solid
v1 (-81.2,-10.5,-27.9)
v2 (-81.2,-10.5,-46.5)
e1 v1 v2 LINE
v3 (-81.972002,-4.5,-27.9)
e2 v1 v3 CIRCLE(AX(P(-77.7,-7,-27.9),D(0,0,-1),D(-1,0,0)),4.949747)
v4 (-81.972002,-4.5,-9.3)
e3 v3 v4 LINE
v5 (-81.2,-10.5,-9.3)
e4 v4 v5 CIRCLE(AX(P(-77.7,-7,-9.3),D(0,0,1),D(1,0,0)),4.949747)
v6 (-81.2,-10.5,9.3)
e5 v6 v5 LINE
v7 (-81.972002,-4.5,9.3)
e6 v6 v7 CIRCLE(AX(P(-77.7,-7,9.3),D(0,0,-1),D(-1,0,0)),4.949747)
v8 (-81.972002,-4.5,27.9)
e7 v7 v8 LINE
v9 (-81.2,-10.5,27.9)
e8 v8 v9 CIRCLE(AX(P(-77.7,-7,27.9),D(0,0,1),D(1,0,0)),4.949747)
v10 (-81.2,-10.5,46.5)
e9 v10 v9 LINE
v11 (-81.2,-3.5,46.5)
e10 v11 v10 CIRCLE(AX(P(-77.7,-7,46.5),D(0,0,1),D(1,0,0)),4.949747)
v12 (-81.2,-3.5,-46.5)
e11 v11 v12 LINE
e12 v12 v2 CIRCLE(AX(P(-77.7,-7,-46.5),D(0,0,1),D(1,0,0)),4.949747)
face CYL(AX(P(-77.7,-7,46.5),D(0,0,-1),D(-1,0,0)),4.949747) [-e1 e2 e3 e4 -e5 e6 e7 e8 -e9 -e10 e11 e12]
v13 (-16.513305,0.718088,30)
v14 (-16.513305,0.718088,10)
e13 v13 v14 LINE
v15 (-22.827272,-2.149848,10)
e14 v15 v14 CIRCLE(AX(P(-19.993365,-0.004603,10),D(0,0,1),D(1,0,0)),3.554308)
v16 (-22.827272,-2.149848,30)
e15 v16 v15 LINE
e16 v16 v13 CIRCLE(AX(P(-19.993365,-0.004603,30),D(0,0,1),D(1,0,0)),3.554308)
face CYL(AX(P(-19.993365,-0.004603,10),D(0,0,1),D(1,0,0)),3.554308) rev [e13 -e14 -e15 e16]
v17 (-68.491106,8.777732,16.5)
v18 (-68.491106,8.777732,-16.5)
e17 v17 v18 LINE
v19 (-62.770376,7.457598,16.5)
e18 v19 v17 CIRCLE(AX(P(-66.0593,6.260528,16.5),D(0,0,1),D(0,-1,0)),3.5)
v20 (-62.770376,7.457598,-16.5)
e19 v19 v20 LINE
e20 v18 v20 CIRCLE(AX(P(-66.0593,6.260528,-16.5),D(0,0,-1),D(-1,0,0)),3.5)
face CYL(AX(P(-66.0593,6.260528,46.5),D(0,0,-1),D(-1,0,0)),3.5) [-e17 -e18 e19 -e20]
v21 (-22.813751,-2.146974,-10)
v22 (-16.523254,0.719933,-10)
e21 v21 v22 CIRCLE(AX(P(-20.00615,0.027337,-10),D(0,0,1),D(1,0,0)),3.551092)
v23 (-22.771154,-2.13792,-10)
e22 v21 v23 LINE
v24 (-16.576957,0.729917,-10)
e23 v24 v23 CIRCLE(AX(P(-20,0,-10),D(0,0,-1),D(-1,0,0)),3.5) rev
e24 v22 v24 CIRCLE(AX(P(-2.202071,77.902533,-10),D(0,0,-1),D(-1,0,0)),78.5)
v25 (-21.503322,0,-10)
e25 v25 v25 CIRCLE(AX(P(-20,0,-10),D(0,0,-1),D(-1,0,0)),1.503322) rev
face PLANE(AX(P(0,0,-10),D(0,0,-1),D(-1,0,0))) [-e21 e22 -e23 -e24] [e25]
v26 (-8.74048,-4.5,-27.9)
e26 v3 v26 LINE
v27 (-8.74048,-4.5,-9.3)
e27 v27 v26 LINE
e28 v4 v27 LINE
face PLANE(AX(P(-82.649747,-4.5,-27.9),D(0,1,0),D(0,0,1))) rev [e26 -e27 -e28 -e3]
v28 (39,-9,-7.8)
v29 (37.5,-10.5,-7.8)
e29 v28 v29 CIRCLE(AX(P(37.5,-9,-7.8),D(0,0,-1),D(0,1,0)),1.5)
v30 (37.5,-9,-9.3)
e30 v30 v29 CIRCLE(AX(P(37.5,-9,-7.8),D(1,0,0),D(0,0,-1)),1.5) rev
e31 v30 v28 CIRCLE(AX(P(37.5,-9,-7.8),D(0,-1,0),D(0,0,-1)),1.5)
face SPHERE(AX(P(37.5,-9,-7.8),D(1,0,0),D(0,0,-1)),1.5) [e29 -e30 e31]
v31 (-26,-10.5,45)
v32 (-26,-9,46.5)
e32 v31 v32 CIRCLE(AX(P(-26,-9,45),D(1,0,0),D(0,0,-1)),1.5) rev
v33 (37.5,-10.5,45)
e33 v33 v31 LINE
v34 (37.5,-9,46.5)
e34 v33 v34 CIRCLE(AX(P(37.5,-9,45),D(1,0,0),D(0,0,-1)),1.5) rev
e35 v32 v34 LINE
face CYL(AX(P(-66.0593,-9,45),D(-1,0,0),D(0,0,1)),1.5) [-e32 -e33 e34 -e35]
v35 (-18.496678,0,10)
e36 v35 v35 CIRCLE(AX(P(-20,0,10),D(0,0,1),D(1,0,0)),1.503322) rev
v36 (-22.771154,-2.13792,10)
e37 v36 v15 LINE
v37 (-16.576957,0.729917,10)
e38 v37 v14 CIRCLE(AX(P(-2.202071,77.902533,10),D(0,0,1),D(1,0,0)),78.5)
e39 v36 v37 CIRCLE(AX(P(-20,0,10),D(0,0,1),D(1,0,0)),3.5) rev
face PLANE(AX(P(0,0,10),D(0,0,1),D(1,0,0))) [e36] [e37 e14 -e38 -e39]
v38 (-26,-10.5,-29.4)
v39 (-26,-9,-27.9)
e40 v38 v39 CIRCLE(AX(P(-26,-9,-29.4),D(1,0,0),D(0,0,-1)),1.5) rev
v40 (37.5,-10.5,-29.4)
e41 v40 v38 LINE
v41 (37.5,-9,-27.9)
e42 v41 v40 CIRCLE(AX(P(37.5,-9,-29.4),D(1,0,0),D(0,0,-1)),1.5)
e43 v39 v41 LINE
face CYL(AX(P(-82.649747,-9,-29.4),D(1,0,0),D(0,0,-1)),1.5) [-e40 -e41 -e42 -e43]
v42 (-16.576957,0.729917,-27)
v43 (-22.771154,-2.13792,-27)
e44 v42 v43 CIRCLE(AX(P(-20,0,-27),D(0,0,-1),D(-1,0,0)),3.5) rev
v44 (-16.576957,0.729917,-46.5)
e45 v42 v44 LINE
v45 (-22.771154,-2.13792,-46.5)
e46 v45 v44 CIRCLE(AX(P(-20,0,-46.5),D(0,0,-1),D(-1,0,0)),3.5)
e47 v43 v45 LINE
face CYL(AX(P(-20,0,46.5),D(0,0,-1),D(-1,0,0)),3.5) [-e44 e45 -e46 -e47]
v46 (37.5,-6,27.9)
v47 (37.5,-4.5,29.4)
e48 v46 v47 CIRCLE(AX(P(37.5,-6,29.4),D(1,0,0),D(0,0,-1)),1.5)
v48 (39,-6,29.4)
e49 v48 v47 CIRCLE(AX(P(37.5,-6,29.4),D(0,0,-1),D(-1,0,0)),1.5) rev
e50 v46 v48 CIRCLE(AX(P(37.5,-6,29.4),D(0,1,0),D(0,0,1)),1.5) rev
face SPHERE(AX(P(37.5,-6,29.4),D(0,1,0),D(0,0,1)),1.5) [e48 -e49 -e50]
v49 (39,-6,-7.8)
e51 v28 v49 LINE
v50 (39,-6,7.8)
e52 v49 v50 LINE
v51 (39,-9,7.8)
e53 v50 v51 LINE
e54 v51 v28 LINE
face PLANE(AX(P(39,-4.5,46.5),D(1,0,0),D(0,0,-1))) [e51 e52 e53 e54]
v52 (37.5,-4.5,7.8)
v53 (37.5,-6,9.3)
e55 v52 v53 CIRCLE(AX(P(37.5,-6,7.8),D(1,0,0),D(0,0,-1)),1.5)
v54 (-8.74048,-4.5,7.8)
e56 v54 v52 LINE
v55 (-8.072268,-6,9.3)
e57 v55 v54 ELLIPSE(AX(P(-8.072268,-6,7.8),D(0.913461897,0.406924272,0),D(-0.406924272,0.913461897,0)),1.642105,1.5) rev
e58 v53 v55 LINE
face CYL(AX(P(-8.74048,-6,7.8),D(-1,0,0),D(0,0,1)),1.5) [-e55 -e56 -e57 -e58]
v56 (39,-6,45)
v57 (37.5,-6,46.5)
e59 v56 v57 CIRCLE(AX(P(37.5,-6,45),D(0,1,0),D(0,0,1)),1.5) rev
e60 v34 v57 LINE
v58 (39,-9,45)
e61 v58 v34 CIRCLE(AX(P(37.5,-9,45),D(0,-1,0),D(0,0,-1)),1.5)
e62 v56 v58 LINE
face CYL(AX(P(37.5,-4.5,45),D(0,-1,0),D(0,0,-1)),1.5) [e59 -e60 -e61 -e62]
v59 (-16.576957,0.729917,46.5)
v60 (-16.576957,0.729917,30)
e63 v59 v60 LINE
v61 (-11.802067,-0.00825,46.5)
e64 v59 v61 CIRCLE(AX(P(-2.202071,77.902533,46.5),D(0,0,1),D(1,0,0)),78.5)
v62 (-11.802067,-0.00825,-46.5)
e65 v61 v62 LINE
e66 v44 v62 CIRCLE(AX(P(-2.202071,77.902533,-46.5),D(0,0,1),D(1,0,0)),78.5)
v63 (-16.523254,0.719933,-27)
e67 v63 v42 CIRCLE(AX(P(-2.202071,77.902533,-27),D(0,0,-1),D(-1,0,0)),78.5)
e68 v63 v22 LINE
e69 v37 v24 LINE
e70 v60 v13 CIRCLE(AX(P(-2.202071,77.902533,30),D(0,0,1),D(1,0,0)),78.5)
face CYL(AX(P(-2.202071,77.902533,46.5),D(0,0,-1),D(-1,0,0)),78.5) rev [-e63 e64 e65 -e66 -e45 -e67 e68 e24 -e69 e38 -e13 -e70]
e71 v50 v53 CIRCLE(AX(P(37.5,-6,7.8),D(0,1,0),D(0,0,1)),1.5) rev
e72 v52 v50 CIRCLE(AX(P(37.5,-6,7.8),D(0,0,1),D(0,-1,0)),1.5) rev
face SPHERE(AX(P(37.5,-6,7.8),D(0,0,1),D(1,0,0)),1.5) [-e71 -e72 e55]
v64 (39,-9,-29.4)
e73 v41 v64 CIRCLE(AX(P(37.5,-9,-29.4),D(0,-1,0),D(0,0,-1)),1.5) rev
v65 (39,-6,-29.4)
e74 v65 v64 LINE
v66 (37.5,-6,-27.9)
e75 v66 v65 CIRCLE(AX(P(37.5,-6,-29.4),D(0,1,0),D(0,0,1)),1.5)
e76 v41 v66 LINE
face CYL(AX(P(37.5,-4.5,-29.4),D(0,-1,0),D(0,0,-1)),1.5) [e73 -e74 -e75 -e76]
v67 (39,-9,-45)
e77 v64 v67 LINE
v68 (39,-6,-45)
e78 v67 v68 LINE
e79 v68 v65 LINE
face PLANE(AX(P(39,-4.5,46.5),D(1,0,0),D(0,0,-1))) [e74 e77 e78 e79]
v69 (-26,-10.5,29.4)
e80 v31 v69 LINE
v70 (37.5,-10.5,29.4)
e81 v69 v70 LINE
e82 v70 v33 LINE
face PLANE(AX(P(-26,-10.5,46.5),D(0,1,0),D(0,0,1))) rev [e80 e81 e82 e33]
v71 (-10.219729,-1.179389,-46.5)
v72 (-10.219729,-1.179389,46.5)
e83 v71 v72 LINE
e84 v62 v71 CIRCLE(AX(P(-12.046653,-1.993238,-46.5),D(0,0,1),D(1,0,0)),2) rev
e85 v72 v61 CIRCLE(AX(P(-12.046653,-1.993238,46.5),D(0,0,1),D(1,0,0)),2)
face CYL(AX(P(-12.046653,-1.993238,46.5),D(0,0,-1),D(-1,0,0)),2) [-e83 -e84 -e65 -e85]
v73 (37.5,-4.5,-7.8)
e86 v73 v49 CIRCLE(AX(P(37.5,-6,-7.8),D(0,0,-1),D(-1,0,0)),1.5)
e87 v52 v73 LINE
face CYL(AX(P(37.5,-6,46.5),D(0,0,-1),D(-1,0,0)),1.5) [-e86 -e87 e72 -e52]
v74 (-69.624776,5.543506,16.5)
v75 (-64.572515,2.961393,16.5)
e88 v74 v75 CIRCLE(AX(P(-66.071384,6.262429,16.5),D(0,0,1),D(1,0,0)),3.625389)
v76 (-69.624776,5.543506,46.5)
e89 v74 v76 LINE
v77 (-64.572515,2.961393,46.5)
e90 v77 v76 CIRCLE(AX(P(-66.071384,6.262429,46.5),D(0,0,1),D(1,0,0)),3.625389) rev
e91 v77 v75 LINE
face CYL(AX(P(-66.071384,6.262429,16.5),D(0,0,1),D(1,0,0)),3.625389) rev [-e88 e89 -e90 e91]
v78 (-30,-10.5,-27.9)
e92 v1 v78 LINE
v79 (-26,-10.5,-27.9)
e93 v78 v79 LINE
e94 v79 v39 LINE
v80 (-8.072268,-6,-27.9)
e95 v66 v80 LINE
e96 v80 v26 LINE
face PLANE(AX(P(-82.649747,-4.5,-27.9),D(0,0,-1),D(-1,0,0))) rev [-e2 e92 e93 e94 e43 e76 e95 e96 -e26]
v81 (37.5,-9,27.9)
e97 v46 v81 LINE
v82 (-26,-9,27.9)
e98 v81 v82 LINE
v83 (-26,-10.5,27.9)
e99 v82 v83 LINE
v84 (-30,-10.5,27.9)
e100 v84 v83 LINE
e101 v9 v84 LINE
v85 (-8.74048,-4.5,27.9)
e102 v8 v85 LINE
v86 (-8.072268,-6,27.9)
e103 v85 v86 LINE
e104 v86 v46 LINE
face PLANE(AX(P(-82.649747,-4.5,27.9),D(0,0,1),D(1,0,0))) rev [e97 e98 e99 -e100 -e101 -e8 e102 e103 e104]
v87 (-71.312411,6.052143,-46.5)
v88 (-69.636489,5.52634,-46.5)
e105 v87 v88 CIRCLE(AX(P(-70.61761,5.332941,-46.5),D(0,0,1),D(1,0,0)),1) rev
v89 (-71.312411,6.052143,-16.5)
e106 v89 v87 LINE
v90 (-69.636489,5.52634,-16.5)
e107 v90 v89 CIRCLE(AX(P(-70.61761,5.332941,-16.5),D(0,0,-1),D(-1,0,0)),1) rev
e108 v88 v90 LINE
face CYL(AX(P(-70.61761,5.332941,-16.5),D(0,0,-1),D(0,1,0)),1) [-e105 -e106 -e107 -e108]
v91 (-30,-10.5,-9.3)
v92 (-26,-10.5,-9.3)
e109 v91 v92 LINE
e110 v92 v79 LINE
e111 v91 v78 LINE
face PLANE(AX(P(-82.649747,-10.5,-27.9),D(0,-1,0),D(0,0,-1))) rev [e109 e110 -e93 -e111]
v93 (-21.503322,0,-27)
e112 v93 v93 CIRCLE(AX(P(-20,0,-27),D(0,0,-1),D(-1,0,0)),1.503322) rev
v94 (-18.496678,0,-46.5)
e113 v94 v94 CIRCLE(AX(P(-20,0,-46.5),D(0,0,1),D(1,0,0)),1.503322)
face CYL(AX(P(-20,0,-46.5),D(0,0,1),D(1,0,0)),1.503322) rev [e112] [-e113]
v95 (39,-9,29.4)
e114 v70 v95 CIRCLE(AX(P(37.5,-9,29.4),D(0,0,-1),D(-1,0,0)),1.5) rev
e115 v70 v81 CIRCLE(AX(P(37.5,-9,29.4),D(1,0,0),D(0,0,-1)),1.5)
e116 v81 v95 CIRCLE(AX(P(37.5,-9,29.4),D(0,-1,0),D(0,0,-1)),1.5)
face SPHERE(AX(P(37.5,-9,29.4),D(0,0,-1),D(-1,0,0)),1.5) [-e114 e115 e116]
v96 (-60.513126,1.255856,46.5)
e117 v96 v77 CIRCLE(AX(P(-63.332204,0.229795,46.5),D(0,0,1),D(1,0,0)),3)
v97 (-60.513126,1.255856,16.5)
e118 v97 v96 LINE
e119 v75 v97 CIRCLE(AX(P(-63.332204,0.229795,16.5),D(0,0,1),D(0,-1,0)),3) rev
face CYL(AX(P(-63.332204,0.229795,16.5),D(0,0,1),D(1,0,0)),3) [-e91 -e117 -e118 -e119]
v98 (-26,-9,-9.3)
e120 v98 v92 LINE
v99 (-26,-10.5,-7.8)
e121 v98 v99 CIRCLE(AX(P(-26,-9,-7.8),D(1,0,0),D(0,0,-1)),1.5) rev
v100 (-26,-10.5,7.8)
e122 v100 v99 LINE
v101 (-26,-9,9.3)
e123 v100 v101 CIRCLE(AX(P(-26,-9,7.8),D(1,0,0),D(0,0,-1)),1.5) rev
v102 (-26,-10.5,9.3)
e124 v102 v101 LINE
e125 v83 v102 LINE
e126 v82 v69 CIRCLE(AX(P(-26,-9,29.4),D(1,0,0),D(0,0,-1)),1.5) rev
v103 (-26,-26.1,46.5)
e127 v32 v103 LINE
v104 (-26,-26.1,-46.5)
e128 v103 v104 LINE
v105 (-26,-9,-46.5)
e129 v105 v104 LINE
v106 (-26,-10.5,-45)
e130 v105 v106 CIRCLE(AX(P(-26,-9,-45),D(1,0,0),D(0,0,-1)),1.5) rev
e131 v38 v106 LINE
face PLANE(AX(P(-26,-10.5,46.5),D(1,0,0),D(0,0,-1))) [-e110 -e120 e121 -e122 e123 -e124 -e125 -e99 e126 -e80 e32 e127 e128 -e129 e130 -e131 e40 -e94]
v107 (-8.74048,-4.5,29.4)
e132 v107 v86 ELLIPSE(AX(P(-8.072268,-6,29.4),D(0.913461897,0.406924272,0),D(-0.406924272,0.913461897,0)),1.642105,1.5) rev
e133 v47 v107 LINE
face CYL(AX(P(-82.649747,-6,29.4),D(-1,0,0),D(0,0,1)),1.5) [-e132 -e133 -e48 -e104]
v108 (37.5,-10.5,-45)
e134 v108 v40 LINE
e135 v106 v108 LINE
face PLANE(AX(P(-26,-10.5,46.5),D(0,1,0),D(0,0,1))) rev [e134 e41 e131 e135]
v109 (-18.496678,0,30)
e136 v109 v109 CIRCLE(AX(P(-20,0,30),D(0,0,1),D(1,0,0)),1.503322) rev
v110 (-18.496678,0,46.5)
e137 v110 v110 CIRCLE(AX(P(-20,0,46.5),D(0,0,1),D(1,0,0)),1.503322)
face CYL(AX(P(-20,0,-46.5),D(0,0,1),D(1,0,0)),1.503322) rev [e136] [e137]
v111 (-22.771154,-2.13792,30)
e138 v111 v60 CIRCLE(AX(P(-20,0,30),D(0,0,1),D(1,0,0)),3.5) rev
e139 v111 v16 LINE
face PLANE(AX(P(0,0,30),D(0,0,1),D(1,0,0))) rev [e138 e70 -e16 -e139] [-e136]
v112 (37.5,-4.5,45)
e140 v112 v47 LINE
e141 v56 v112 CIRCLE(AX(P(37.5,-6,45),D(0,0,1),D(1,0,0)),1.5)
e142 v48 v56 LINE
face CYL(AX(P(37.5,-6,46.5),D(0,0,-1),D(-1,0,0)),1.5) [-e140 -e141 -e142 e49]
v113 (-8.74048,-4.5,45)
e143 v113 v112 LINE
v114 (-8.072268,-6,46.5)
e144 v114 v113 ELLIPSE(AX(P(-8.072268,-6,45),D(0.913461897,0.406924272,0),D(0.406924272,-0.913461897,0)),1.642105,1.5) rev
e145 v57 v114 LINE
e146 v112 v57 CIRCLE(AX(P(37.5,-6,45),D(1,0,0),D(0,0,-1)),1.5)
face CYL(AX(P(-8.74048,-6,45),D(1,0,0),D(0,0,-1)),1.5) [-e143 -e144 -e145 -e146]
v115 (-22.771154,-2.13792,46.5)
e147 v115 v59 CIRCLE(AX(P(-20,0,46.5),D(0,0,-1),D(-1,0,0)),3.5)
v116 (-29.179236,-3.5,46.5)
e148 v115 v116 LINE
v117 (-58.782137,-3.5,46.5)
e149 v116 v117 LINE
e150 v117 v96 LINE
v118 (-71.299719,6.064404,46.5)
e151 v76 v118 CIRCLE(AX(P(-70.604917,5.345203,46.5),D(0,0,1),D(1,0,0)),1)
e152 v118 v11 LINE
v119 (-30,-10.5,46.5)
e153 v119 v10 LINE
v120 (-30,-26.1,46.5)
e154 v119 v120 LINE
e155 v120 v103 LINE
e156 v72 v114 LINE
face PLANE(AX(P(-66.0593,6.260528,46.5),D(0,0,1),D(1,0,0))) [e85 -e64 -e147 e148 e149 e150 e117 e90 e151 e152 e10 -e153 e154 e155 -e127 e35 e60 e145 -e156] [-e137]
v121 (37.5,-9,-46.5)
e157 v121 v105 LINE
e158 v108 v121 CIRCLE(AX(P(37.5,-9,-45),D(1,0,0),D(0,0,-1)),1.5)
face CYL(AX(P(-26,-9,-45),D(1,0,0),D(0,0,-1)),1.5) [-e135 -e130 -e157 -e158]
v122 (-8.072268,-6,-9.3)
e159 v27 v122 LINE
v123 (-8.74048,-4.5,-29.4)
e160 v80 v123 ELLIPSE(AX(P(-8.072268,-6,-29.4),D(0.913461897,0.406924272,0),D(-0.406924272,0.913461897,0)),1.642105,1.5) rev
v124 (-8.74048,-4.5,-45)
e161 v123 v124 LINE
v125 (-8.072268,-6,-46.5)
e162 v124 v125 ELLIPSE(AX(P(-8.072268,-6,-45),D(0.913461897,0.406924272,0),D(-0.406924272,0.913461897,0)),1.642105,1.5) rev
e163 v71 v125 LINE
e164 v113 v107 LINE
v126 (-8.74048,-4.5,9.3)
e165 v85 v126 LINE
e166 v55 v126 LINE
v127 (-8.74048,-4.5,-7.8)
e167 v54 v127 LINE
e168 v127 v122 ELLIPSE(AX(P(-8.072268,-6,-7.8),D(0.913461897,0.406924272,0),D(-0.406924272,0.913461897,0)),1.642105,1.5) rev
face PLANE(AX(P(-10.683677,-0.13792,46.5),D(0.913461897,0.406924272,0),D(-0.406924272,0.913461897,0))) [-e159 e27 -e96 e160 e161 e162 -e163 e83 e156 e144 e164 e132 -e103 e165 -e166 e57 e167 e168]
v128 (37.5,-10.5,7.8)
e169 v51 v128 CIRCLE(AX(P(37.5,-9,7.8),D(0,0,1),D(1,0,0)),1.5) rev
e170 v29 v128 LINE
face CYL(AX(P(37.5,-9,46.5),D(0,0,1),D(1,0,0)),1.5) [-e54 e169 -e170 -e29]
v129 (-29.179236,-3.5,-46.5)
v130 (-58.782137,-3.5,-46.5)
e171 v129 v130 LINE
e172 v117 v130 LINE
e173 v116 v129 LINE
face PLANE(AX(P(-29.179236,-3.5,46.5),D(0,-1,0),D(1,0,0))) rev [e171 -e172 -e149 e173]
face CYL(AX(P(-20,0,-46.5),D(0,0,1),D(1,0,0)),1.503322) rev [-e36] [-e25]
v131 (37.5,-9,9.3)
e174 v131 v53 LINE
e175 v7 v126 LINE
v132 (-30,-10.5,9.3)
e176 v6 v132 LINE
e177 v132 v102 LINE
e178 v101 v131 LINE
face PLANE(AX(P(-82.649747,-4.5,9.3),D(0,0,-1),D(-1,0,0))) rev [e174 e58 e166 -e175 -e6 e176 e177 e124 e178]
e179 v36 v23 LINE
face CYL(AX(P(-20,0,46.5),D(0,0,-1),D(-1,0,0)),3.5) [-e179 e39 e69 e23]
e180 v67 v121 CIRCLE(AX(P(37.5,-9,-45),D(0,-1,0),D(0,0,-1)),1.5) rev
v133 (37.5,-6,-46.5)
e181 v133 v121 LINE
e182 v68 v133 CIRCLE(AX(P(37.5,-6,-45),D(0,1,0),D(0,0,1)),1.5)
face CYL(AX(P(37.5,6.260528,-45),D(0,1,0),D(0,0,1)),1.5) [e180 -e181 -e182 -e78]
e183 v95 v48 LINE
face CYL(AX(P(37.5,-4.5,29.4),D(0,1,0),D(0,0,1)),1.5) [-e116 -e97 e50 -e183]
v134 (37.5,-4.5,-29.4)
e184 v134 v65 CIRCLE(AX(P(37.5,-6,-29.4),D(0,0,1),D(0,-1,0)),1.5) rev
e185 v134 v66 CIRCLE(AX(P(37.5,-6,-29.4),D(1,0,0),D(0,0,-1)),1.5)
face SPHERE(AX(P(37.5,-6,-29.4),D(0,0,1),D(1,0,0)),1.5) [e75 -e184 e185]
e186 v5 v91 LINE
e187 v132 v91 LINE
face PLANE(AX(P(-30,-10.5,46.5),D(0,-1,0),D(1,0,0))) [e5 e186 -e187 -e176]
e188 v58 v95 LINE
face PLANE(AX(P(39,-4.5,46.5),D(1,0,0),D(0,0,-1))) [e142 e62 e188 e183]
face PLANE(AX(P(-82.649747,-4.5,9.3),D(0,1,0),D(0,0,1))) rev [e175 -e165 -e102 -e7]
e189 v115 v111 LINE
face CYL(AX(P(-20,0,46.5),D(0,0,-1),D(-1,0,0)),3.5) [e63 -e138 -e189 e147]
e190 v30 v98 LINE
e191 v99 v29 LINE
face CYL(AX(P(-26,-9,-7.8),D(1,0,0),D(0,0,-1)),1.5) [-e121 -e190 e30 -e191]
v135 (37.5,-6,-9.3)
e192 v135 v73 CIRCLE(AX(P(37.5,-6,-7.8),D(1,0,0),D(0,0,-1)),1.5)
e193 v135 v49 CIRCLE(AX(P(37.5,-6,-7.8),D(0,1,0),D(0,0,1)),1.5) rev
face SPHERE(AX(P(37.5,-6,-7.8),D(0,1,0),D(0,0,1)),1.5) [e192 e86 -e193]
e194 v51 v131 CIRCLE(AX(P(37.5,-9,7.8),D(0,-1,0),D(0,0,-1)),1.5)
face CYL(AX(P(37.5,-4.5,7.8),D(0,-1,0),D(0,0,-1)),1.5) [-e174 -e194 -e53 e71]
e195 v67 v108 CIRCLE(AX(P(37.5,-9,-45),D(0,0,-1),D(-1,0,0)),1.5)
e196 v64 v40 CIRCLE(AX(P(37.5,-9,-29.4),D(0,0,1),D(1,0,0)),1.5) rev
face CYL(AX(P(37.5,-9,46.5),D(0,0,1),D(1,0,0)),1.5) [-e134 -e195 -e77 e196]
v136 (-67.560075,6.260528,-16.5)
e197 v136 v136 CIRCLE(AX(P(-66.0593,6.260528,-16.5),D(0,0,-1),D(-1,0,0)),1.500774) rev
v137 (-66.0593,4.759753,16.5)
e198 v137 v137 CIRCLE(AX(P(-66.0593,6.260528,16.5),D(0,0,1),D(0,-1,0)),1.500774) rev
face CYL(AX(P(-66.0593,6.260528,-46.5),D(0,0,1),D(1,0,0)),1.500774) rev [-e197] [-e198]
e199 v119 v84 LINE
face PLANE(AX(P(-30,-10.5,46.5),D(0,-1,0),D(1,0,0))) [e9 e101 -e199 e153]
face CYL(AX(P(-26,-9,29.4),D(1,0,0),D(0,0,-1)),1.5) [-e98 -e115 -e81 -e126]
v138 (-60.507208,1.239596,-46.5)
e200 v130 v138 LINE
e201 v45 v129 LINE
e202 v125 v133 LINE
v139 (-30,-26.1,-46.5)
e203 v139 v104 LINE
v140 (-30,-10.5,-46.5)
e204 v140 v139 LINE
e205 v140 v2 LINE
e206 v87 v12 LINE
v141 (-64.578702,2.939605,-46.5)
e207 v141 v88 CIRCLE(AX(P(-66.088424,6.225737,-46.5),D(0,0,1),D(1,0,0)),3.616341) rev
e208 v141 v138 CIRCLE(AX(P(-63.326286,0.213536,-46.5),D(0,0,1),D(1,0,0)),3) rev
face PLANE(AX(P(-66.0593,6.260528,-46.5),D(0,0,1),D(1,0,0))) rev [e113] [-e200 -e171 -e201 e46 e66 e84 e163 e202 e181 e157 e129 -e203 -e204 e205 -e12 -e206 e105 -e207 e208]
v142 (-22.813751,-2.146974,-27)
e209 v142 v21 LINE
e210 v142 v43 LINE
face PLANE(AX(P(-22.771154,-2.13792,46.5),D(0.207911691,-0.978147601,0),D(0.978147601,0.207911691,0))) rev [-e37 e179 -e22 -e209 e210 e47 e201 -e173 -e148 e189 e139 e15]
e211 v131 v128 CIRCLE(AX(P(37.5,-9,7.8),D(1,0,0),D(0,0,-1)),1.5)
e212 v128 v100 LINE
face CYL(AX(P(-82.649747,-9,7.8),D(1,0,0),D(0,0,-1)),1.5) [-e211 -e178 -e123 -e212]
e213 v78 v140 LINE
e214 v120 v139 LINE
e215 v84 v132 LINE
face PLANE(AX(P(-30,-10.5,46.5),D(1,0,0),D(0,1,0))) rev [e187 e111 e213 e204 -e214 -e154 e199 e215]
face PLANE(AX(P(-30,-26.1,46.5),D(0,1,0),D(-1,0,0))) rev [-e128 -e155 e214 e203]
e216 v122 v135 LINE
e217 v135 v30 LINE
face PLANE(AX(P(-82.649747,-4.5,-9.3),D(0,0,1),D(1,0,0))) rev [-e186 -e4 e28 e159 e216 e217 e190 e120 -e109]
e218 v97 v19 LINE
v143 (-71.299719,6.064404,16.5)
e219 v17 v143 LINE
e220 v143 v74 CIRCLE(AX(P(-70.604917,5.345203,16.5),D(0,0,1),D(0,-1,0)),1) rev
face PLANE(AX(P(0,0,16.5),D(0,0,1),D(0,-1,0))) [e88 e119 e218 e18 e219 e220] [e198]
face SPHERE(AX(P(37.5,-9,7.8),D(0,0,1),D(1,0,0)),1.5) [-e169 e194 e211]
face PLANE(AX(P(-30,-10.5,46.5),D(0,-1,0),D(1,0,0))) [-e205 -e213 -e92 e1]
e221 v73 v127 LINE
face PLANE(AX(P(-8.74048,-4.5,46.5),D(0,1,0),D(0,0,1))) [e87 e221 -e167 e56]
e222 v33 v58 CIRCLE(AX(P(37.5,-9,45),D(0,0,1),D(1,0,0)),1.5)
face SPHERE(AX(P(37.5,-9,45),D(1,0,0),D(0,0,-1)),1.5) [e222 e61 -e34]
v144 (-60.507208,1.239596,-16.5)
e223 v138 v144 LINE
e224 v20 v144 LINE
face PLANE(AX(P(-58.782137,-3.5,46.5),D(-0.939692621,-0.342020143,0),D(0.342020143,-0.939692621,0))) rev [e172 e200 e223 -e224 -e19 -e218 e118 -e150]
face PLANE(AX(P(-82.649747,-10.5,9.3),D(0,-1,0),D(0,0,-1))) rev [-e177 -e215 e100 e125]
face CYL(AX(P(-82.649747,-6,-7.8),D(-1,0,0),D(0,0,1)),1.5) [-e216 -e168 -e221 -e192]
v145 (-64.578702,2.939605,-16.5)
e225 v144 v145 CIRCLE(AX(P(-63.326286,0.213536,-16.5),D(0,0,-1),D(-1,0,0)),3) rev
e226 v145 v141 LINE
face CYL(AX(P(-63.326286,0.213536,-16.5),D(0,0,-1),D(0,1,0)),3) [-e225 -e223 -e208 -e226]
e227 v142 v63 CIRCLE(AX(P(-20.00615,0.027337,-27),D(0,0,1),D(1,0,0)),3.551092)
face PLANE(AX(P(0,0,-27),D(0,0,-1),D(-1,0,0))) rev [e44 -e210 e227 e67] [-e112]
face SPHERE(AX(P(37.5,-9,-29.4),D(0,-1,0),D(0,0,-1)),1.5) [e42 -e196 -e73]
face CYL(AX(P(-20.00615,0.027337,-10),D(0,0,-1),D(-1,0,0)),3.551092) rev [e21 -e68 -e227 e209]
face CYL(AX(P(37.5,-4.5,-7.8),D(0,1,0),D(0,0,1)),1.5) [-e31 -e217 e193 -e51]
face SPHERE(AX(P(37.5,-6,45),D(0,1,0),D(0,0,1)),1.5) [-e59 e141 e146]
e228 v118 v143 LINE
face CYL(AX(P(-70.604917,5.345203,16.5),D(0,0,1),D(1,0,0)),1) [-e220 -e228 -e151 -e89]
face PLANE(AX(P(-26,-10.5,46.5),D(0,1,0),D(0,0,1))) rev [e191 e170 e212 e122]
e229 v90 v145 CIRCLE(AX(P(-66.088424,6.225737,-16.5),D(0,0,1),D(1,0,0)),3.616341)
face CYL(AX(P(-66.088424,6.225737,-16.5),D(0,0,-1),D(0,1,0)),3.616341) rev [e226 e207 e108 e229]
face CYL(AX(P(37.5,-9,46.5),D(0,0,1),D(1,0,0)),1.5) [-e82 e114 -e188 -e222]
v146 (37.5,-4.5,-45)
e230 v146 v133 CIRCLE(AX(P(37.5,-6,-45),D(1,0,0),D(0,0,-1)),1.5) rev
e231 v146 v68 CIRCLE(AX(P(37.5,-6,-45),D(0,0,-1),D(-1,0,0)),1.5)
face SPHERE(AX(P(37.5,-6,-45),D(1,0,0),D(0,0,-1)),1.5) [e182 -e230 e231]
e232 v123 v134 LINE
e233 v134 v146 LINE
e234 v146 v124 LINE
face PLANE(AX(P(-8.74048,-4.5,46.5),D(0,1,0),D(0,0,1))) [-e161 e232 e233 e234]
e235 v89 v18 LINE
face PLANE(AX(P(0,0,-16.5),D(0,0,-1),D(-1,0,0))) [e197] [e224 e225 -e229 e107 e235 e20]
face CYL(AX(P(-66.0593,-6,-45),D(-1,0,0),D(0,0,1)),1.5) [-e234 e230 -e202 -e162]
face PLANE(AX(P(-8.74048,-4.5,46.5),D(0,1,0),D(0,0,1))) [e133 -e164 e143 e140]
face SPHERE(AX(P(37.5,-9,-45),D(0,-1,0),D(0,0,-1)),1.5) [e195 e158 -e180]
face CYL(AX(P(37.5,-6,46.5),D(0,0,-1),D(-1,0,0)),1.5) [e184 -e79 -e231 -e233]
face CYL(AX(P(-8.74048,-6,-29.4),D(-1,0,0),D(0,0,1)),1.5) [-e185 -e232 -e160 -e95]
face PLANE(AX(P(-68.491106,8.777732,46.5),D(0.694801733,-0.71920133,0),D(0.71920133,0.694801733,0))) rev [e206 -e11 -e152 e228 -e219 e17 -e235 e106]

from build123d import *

# Parameters (mm, degrees)
SALIENTE_EXTRUIR2_DEPTH   = 46.5
CROQUIS3_R                = 1.500774296
CROQUIS3_R_2              = 1.503322105
CORTAR_EXTRUIR1_DEPTH     = 46.5
CORTAR_EXTRUIR2_START     = 16.5
CORTAR_EXTRUIR2_OUTLINE_R = 1.500774296
CORTAR_EXTRUIR2_DEPTH     = 30
REDONDEO2_R               = 3
CORTAR_EXTRUIR3_START     = -46.5
CORTAR_EXTRUIR3_OUTLINE_R = 1.500774296
CORTAR_EXTRUIR3_DEPTH     = 30
REDONDEO3_R               = 3
CORTAR_EXTRUIR4_START     = 10
CORTAR_EXTRUIR4_OUTLINE_R = 1.503322105
CORTAR_EXTRUIR4_DEPTH     = 20
CORTAR_EXTRUIR5_START     = -27
CORTAR_EXTRUIR5_OUTLINE_R = 1.503322105
CORTAR_EXTRUIR5_DEPTH     = 17
REDONDEO4_R               = 1
CROQUIS4_W                = 18.6
CROQUIS4_H                = 6
CORTAR_EXTRUIR6_DEPTH     = 133.823646461
CROQUIS5_W                = 18.6
CROQUIS5_H                = 6
CORTAR_EXTRUIR7_DEPTH     = 133.823646461
REDONDEO5_R               = 1.5
REDONDEO6_R               = 2


# Read off the part's stored shape, not the designer's step: Cortar-Extruir2, Cortar-Extruir3, Cortar-Extruir4, Cortar-Extruir5
with BuildPart() as part:
    # Croquis1 → Saliente-Extruir2 (new, symmetric)
    with BuildSketch(Plane.XY):
        with BuildLine():
            Line((-10.68367701, -0.137920216), (-8.740480313, -4.5))
            Line((-8.740480313, -4.5), (39, -4.5))
            Line((39, -4.5), (39, -10.5))
            Line((39, -10.5), (-26, -10.5))
            Line((-26, -10.5), (-26, -26.1))
            Line((-26, -26.1), (-30, -26.1))
            Line((-30, -26.1), (-30, -10.5))
            Line((-30, -10.5), (-81.2, -10.5))
            ThreePointArc((-81.2, -10.5), (-82.649747468, -7), (-81.2, -3.5))
            Line((-81.2, -3.5), (-68.491106331, 8.777732226))
            ThreePointArc((-68.491106331, 8.777732226), (-65.272311444, 9.670901246), (-62.770376094, 7.457598075))
            Line((-62.770376094, 7.457598075), (-58.782136556, -3.5))
            Line((-58.782136556, -3.5), (-29.179236041, -3.5))
            Line((-29.179236041, -3.5), (-22.771154479, -2.137920216))
            ThreePointArc((-22.771154479, -2.137920216), (-21.470497358, 3.176104142), (-16.576957377, 0.729917256))
            ThreePointArc((-16.576957377, 0.729917256), (-13.638551951, 0.240078221), (-10.68367701, -0.137920216))
        make_face()
    extrude(amount=SALIENTE_EXTRUIR2_DEPTH, both=True)

    # Croquis3 → Cortar-Extruir1 (cut, symmetric)
    with BuildSketch(Plane.XY):
        with Locations((-66.059300267, 6.260527573)):
            Circle(CROQUIS3_R)
        with Locations((-20, 0)):
            Circle(CROQUIS3_R_2)
    extrude(amount=CORTAR_EXTRUIR1_DEPTH, both=True, mode=Mode.SUBTRACT)

    # Cortar-Extruir2 outline → Cortar-Extruir2 (cut)
    with BuildSketch(Plane.XY.offset(CORTAR_EXTRUIR2_START)):
        with BuildLine():
            Line((-68.491106331, 8.777732226), (-69.201699105, 8.091246996))
            ThreePointArc((-69.201699105, 8.091246996), (-66.848168988, 2.721235528), (-62.462991688, 6.61306636))
            Line((-62.462991688, 6.61306636), (-62.770376094, 7.457598075))
            ThreePointArc((-62.770376094, 7.457598075), (-65.272311444, 9.670901246), (-68.491106331, 8.777732226))
        make_face()
        with Locations((-66.059300267, 6.260527573)):
            Circle(CORTAR_EXTRUIR2_OUTLINE_R, mode=Mode.SUBTRACT)
    extrude(amount=CORTAR_EXTRUIR2_DEPTH, mode=Mode.SUBTRACT)

    # Redondeo2
    redondeo2_edges = [part.edges().sort_by_distance(p)[0] for p in [
        (-62.462991688, 6.61306636, 31.5),
    ]]
    fillet(redondeo2_edges, radius=REDONDEO2_R)

    # Cortar-Extruir3 outline → Cortar-Extruir3 (cut)
    with BuildSketch(Plane.XY.offset(CORTAR_EXTRUIR3_START)):
        with BuildLine():
            ThreePointArc((-69.164573514, 8.127113066), (-66.827048097, 2.685630168), (-62.508602445, 6.738380883))
            Line((-62.508602445, 6.738380883), (-62.770376094, 7.457598075))
            ThreePointArc((-62.770376094, 7.457598075), (-65.272311444, 9.670901246), (-68.491106331, 8.777732226))
            Line((-68.491106331, 8.777732226), (-69.164573514, 8.127113066))
        make_face()
        with Locations((-66.059300267, 6.260527573)):
            Circle(CORTAR_EXTRUIR3_OUTLINE_R, mode=Mode.SUBTRACT)
    extrude(amount=CORTAR_EXTRUIR3_DEPTH, mode=Mode.SUBTRACT)

    # Redondeo3
    redondeo3_edges = [part.edges().sort_by_distance(p)[0] for p in [
        (-62.508602445, 6.738380883, -31.5),
    ]]
    fillet(redondeo3_edges, radius=REDONDEO3_R)

    # Cortar-Extruir4 outline → Cortar-Extruir4 (cut)
    with BuildSketch(Plane.XY.offset(CORTAR_EXTRUIR4_START)):
        with BuildLine():
            Line((-22.771154479, -2.137920216), (-22.827271519, -2.149848262))
            ThreePointArc((-22.827271519, -2.149848262), (-18.523452571, -3.240720775), (-16.513304708, 0.718087877))
            ThreePointArc((-16.513304708, 0.718087877), (-16.545132262, 0.723996005), (-16.576957377, 0.729917256))
            ThreePointArc((-16.576957377, 0.729917256), (-21.470497358, 3.176104142), (-22.771154479, -2.137920216))
        make_face()
        with Locations((-20, 0)):
            Circle(CORTAR_EXTRUIR4_OUTLINE_R, mode=Mode.SUBTRACT)
    extrude(amount=CORTAR_EXTRUIR4_DEPTH, mode=Mode.SUBTRACT)

    # Cortar-Extruir5 outline → Cortar-Extruir5 (cut)
    with BuildSketch(Plane.XY.offset(CORTAR_EXTRUIR5_START)):
        with BuildLine():
            ThreePointArc((-22.813751372, -2.146974465), (-18.533466696, -3.203987987), (-16.523253553, 0.719933216))
            ThreePointArc((-16.523253553, 0.719933216), (-16.550106333, 0.724920565), (-16.576957377, 0.729917256))
            ThreePointArc((-16.576957377, 0.729917256), (-21.470497358, 3.176104142), (-22.771154479, -2.137920216))
            Line((-22.771154479, -2.137920216), (-22.813751372, -2.146974465))
        make_face()
        with Locations((-20, 0)):
            Circle(CORTAR_EXTRUIR5_OUTLINE_R, mode=Mode.SUBTRACT)
    extrude(amount=CORTAR_EXTRUIR5_DEPTH, mode=Mode.SUBTRACT)

    # Redondeo4
    redondeo4_edges = [part.edges().sort_by_distance(p)[0] for p in [
        (-69.201699105, 8.091246996, 31.5),
        (-69.164573514, 8.127113066, -31.5),
    ]]
    fillet(redondeo4_edges, radius=REDONDEO4_R)

    # Croquis4 → Cortar-Extruir6 (cut, through all)
    with BuildSketch(Plane(origin=(39, 0, 0), x_dir=(0, 0, -1), z_dir=(1, 0, 0))):
        with Locations((18.6, -7.5)):
            Rectangle(CROQUIS4_W, CROQUIS4_H)
    extrude(amount=-CORTAR_EXTRUIR6_DEPTH, mode=Mode.SUBTRACT)

    # Croquis5 → Cortar-Extruir7 (cut, through all)
    with BuildSketch(Plane(origin=(39, 0, 0), x_dir=(0, 0, -1), z_dir=(1, 0, 0))):
        with Locations((-18.6, -7.5)):
            Rectangle(CROQUIS5_W, CROQUIS5_H)
    extrude(amount=-CORTAR_EXTRUIR7_DEPTH, mode=Mode.SUBTRACT)

    # Redondeo5
    redondeo5_edges = [part.edges().sort_by_distance(p)[0] for p in [
        (39, -4.5, -37.2),
        (15.129759844, -4.5, -46.5),
        (39, -10.5, -37.2),
        (39, -7.5, -46.5),
        (6.5, -10.5, -46.5),
        (6.5, -10.5, -27.9),
        (15.129759844, -4.5, -27.9),
        (6.5, -10.5, -9.3),
        (15.129759844, -4.5, -9.3),
        (39, -7.5, -27.9),
        (39, -7.5, -9.3),
        (39, -4.5, 0),
        (39, -10.5, 0),
        (6.5, -10.5, 9.3),
        (15.129759844, -4.5, 9.3),
        (6.5, -10.5, 27.9),
        (15.129759844, -4.5, 27.9),
        (39, -7.5, 9.3),
        (39, -7.5, 27.9),
        (39, -4.5, 37.2),
        (39, -10.5, 37.2),
        (6.5, -10.5, 46.5),
        (39, -7.5, 46.5),
        (15.129759844, -4.5, 46.5),
    ]]
    fillet(redondeo5_edges, radius=REDONDEO5_R)

    # Redondeo6
    redondeo6_edges = [part.edges().sort_by_distance(p)[0] for p in [
        (-10.68367701, -0.137920216, 0),
    ]]
    fillet(redondeo6_edges, radius=REDONDEO6_R)


solid = part.part
